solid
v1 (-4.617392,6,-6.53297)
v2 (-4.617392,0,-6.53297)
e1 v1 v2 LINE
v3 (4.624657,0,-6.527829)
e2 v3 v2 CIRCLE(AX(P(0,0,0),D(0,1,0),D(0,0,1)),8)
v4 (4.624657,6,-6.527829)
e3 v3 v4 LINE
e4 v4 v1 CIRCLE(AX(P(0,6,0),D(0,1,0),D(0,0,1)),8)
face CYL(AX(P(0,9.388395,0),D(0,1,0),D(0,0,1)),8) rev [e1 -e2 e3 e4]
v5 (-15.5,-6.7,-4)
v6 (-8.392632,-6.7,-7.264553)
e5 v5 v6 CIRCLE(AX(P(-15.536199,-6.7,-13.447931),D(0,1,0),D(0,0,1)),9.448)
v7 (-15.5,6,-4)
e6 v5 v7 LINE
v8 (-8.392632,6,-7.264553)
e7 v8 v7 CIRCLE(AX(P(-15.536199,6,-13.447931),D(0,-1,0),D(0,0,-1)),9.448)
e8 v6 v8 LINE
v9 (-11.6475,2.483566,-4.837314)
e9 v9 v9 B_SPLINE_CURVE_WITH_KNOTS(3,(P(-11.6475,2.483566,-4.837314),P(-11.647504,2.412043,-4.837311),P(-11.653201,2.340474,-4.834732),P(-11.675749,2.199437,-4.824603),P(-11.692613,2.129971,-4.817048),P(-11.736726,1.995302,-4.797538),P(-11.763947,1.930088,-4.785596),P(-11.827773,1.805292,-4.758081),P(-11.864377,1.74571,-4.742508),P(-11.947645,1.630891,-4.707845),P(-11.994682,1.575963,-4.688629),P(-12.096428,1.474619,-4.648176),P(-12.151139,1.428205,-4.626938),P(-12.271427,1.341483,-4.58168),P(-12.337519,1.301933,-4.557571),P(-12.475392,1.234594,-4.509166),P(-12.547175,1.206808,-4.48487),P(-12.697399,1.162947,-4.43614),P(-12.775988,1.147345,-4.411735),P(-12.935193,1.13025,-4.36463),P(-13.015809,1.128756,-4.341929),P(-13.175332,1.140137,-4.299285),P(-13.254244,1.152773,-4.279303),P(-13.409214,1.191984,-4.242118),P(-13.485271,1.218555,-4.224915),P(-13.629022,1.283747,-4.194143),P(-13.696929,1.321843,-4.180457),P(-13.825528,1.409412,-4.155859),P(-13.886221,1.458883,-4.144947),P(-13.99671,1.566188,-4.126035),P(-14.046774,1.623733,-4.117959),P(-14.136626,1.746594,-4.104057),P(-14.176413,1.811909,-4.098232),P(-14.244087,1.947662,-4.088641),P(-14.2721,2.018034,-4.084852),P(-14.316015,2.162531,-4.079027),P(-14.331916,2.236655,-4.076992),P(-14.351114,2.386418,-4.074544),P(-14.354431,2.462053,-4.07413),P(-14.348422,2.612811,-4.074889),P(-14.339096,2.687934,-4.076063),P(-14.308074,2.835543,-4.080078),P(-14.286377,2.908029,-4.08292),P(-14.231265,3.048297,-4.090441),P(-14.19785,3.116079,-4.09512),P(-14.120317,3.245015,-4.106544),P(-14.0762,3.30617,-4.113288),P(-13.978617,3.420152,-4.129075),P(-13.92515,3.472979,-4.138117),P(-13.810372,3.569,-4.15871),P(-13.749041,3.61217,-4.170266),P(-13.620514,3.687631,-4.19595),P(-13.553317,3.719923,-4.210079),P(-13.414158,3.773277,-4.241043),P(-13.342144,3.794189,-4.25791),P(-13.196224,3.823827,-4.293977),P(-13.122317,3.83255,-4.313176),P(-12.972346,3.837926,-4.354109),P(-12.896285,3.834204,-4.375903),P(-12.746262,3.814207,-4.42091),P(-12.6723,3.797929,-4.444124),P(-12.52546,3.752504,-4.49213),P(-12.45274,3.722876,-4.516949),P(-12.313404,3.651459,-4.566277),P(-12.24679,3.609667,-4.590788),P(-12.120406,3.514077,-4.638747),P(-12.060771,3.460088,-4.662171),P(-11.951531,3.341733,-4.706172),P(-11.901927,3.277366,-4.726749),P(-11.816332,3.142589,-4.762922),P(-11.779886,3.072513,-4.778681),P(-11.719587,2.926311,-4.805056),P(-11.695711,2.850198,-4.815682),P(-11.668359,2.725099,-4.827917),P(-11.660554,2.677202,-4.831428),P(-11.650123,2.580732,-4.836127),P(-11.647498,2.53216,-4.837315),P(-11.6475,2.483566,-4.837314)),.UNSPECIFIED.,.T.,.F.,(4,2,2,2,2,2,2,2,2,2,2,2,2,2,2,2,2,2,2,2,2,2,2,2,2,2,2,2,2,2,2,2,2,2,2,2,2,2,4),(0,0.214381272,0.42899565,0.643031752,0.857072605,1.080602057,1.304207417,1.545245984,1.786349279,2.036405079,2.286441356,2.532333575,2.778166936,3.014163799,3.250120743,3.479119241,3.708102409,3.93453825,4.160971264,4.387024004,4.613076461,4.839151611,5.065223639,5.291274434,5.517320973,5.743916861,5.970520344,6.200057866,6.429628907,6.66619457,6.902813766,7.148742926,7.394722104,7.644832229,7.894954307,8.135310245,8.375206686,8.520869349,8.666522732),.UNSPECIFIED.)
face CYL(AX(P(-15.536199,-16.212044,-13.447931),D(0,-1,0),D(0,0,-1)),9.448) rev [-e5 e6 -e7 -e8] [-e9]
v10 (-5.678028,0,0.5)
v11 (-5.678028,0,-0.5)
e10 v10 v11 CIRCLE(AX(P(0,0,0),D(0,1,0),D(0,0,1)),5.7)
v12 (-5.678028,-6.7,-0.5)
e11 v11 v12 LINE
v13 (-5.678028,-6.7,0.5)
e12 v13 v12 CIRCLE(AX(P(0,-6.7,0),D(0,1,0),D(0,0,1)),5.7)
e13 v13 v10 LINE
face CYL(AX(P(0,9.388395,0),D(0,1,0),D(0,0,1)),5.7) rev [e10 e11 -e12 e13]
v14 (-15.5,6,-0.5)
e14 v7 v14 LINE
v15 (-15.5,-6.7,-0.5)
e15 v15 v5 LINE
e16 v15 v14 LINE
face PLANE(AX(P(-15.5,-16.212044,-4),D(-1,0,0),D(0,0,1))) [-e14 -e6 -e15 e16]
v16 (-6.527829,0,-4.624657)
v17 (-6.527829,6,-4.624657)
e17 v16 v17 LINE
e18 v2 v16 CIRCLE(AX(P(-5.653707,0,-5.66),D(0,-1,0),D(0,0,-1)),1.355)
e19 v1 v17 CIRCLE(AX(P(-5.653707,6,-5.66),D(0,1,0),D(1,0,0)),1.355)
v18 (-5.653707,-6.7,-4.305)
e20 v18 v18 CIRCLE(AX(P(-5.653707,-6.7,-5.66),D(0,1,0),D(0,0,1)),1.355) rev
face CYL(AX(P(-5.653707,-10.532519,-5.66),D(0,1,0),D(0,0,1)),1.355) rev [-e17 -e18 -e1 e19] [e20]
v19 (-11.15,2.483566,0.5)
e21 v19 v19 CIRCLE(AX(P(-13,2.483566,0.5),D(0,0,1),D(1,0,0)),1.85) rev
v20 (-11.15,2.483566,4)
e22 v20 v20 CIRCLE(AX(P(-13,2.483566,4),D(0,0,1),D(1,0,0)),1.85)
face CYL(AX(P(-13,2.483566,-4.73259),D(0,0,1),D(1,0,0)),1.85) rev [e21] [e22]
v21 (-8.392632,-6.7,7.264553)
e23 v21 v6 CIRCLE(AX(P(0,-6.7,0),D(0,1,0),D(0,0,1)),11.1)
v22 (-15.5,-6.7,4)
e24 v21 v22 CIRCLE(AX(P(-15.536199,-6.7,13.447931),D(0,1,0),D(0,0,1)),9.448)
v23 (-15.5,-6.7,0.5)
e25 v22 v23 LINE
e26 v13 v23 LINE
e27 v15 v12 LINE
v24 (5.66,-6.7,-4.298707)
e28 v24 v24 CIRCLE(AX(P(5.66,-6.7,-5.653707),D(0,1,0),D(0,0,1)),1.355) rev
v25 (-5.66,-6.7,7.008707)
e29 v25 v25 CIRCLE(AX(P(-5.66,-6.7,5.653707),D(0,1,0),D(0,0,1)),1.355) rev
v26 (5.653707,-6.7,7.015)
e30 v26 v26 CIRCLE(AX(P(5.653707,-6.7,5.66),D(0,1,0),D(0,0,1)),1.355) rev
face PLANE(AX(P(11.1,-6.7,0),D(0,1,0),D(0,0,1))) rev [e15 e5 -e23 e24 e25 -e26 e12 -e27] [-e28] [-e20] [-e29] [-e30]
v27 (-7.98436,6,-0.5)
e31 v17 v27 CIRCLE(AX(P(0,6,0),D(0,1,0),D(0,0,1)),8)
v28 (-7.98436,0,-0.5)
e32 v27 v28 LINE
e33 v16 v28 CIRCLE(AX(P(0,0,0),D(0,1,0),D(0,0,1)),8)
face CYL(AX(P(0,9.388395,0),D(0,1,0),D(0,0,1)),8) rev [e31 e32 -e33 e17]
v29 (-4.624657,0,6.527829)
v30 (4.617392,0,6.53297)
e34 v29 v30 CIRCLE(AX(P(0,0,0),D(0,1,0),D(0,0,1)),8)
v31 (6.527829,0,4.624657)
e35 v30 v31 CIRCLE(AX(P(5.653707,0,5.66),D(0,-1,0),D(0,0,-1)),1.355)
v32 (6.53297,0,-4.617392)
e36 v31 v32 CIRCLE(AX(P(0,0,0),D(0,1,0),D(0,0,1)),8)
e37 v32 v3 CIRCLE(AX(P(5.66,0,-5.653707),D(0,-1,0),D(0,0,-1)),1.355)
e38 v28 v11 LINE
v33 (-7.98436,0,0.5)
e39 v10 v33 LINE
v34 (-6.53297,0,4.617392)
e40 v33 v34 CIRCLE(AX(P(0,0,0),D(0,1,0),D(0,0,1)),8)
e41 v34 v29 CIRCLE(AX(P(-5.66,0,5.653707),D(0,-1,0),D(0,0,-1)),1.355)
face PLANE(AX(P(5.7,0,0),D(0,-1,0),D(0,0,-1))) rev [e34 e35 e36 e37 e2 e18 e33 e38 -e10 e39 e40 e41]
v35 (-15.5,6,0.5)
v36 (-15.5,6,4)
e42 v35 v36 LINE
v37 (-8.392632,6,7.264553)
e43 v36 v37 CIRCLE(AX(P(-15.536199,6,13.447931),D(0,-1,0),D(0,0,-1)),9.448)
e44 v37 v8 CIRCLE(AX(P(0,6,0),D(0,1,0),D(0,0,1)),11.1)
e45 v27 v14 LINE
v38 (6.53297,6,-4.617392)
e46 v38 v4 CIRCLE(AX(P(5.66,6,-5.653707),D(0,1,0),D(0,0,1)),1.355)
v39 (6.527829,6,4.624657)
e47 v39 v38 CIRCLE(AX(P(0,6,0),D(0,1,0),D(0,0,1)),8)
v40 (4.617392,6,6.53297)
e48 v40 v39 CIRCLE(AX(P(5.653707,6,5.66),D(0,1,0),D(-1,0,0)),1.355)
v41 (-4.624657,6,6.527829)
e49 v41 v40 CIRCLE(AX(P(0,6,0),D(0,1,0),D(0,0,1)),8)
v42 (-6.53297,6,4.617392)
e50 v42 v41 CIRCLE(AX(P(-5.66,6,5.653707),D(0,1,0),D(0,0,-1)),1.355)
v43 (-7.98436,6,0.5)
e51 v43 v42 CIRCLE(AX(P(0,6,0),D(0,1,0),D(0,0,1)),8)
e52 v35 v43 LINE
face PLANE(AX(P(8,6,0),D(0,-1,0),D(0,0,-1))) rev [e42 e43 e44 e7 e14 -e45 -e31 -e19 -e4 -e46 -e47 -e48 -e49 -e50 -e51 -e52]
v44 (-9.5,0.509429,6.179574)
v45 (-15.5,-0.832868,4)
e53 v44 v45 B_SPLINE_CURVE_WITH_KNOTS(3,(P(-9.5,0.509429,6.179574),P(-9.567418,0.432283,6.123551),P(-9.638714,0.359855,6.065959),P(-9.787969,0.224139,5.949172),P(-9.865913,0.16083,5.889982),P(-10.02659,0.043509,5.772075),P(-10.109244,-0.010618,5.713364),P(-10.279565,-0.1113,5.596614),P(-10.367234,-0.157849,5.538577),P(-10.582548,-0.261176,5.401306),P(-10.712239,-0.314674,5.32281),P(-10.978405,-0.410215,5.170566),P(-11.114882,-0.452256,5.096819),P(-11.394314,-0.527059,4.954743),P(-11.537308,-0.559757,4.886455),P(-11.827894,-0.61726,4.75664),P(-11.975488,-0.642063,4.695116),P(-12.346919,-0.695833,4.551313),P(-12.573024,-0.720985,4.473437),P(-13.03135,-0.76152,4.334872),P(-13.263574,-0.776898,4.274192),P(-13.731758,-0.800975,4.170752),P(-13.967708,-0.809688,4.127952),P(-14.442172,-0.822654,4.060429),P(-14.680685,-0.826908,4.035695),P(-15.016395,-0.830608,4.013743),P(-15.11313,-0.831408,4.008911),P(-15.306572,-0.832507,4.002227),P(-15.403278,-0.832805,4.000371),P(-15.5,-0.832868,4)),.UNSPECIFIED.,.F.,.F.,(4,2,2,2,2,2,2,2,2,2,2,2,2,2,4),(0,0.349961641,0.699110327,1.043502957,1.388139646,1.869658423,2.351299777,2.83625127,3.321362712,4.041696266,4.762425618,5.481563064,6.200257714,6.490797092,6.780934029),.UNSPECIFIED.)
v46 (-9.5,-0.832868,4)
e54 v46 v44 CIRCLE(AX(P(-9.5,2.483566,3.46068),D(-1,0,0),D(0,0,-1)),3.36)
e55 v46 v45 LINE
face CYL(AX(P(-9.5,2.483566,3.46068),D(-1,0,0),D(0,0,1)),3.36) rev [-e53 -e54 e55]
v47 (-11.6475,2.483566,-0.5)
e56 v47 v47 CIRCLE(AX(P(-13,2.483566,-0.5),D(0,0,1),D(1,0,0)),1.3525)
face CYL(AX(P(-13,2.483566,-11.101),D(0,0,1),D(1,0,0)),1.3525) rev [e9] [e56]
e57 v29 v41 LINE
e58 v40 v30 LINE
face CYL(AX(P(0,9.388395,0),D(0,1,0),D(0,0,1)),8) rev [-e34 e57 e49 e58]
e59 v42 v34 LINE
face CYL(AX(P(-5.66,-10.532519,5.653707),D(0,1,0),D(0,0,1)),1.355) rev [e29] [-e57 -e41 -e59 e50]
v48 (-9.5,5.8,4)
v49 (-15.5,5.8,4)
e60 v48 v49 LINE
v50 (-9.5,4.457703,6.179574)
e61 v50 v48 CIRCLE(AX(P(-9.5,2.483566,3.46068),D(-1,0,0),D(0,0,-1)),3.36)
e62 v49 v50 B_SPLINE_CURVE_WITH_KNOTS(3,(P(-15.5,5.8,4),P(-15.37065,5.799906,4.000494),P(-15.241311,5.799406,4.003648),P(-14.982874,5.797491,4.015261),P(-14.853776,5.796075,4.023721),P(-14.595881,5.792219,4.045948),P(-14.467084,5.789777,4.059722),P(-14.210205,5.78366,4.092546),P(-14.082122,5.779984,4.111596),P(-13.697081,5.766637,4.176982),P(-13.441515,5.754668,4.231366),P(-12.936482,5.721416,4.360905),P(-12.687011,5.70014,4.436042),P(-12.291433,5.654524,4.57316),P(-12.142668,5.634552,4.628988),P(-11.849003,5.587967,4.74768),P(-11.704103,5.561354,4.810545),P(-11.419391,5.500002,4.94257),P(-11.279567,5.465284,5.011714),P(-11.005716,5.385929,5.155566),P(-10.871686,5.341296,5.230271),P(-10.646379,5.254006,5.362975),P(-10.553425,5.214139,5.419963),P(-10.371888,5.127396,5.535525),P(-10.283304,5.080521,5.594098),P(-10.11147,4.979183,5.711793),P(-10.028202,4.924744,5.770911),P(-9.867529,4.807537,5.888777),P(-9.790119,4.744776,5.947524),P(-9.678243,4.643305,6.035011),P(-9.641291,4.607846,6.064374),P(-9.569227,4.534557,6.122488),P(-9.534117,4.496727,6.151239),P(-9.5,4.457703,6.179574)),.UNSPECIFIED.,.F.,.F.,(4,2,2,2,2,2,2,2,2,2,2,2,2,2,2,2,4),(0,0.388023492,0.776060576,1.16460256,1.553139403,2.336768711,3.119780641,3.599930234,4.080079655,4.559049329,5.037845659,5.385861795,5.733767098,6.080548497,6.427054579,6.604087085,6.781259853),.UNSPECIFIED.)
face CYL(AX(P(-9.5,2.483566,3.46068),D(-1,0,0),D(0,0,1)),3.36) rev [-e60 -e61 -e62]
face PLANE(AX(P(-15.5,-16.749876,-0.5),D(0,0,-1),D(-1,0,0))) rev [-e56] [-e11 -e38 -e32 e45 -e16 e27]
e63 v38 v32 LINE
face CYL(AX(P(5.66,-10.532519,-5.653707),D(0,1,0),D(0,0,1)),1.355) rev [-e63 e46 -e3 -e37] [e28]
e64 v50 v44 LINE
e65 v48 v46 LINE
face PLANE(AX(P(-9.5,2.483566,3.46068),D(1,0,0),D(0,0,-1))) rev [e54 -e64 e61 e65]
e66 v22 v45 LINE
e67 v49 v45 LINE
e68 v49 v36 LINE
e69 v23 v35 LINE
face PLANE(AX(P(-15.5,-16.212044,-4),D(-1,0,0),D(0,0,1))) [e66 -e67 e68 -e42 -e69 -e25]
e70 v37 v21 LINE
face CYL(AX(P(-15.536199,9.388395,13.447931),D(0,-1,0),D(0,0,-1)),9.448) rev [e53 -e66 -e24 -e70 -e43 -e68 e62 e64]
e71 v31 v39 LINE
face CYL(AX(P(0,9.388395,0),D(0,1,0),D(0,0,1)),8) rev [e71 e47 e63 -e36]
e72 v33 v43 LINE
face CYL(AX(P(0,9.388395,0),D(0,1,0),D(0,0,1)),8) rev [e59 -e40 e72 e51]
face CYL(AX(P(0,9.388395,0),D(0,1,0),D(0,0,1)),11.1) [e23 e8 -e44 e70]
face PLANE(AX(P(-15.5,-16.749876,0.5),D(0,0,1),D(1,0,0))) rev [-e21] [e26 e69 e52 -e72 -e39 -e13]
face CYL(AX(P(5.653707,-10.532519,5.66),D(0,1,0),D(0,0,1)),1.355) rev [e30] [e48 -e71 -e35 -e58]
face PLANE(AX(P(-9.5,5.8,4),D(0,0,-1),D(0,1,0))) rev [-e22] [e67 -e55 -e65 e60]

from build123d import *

# Parameters (mm, degrees)
SKETCH2_R          = 1.355
CUT_EXTRUDE1_DEPTH = 12.7
CIRPATTERN1_COUNT  = 4
SKETCH3_W          = 5.14577381
SKETCH3_H          = 8
EXTRUDE1_DEPTH     = 12.7
FILLET1_R          = 9.448
CUT_EXTRUDE2_REACH = 24.907
SKETCH4_W          = 10
SKETCH4_H          = 1
CUT_EXTRUDE3_DEPTH = 6
SKETCH6_R          = 1.85
CUT_EXTRUDE4_DEPTH = 3.5
CUT_EXTRUDE5_REACH = 22.487
SKETCH7_R          = 1.3525


with BuildPart() as part:
    # Sketch1 → Revolve1 (revolve)
    with BuildSketch(Plane.XY, mode=Mode.PRIVATE) as revolve1_sk:
        Polygon((5.7, 0), (8, 0), (8, 6), (11.1, 6), (11.1, -6.7), (5.7, -6.7), align=None)
    revolve(revolve1_sk.sketch.rotate(Axis((0, 9.388395062, 0), (0, -1, 0)), 90), axis=Axis((0, 9.388395062, 0), (0, -1, 0)))

    # Sketch2 → Cut-Extrude1 (cut)
    with BuildSketch(Plane(origin=(0, 6, 0), x_dir=(1, 0, 0), z_dir=(0, 1, 0))):
        with Locations(Location((5.66, 5.653706749, 0), (0, 0, 270))):
            Circle(SKETCH2_R)
    cut_extrude1 = extrude(amount=-CUT_EXTRUDE1_DEPTH, mode=Mode.SUBTRACT)

    # CirPattern1: Cut-Extrude1 ×4 about axis
    cirpattern1_axis = Axis((0, 0, 0), (0, 1, 0))
    for i in range(1, CIRPATTERN1_COUNT):
        add(cut_extrude1.rotate(cirpattern1_axis, i * 360 / CIRPATTERN1_COUNT), mode=Mode.SUBTRACT)

    # Sketch3 → Extrude1 (add)
    with BuildSketch(Plane(origin=(0, 6, 0), x_dir=(1, 0, 0), z_dir=(0, 1, 0))):
        with Locations((-12.927113095, 0)):
            Rectangle(SKETCH3_W, SKETCH3_H)
    extrude(amount=-EXTRUDE1_DEPTH)

    # Fillet1
    # the kernel refuses this fillet: 9.448 mm, written as the material it adds along each edge
    with BuildSketch(Plane(origin=(-10.35422619, 6, -4), x_dir=(-1, 0, 0), z_dir=(0, -1, 0))) as fillet1_piece_1_section:
        with BuildLine():
            CenterArc((5.181912326, 9.448), FILLET1_R, 220.879291984, 49.120708016)
            ThreePointArc((-1.961626544, 3.264590228), (-0.839750005, 1.717057191), (0, 0))
            Line((0, 0), (5.181912326, 0))
        make_face()
    fillet1_piece_1 = extrude(amount=12.7, mode=Mode.PRIVATE)
    fillet1_piece_1 = split(fillet1_piece_1, bisect_by=Plane(origin=(-15.5, -0.35, -4.693597662), z_dir=(1, 0, 0)), keep=Keep.TOP, mode=Mode.PRIVATE)
    add(fillet1_piece_1)
    with BuildSketch(Plane(origin=(-10.35422619, 6, 4), x_dir=(-1, 0, 0), z_dir=(0, -1, 0))) as fillet1_piece_2_section:
        with BuildLine():
            CenterArc((5.181912326, -9.448), FILLET1_R, 90, 49.120708016)
            ThreePointArc((-1.961626544, -3.264590228), (-0.839750005, -1.717057191), (0, 0))
            Line((0, 0), (5.181912326, 0))
        make_face()
    fillet1_piece_2 = extrude(amount=12.7, mode=Mode.PRIVATE)
    fillet1_piece_2 = split(fillet1_piece_2, bisect_by=Plane(origin=(-15.5, -0.35, 4.693597662), z_dir=(1, 0, 0)), keep=Keep.TOP, mode=Mode.PRIVATE)
    add(fillet1_piece_2)

    # Cut-Extrude2: up to this face of the body (flat: up to its plane)
    cut_extrude2_end = Plane(part.part.faces().sort_by_distance((-15.153532108, -6.7, 0))[0])
    # Sketch4 → Cut-Extrude2 (cut, up to the picked face)
    with BuildSketch(Plane(origin=(0, 6, 0), x_dir=(1, 0, 0), z_dir=(0, 1, 0)), mode=Mode.PRIVATE) as cut_extrude2_sk1:
        with Locations((-10.5, 0)):
            Rectangle(SKETCH4_W, SKETCH4_H)
    cut_extrude2_tool1 = split(extrude(cut_extrude2_sk1.sketch, amount=-CUT_EXTRUDE2_REACH, mode=Mode.PRIVATE), bisect_by=cut_extrude2_end, keep=Keep.BOTH, mode=Mode.PRIVATE)
    add(cut_extrude2_tool1.solids().sort_by(Axis((-10.5, 6, 0), (0, -1, 0)))[0], mode=Mode.SUBTRACT)

    # Sketch5 → Cut-Extrude3 (cut)
    with BuildSketch(Plane.ZY.offset(15.5)):
        with BuildLine():
            Line((4, 5.8), (4, -0.83286788))
            ThreePointArc((4, -0.83286788), (6.82068013, 2.48356606), (4, 5.8))
        make_face()
    extrude(amount=-CUT_EXTRUDE3_DEPTH, mode=Mode.SUBTRACT)

    # Sketch6 → Cut-Extrude4 (cut)
    with BuildSketch(Plane.XY.offset(4)):
        with Locations((-13, 2.48356606)):
            Circle(SKETCH6_R)
    extrude(amount=-CUT_EXTRUDE4_DEPTH, mode=Mode.SUBTRACT)

    # Sketch7 → Cut-Extrude5 (cut, up to next)
    with BuildSketch(Plane.XY.offset(-0.5), mode=Mode.PRIVATE) as cut_extrude5_sk1:
        with Locations((-13, 2.48356606)):
            Circle(SKETCH7_R)
    cut_extrude5_tool1 = extrude(cut_extrude5_sk1.sketch, amount=-CUT_EXTRUDE5_REACH, mode=Mode.PRIVATE) & part.part
    add(cut_extrude5_tool1.solids().sort_by_distance((-13, 2.483566, -0.5))[0], mode=Mode.SUBTRACT)


solid = part.part
